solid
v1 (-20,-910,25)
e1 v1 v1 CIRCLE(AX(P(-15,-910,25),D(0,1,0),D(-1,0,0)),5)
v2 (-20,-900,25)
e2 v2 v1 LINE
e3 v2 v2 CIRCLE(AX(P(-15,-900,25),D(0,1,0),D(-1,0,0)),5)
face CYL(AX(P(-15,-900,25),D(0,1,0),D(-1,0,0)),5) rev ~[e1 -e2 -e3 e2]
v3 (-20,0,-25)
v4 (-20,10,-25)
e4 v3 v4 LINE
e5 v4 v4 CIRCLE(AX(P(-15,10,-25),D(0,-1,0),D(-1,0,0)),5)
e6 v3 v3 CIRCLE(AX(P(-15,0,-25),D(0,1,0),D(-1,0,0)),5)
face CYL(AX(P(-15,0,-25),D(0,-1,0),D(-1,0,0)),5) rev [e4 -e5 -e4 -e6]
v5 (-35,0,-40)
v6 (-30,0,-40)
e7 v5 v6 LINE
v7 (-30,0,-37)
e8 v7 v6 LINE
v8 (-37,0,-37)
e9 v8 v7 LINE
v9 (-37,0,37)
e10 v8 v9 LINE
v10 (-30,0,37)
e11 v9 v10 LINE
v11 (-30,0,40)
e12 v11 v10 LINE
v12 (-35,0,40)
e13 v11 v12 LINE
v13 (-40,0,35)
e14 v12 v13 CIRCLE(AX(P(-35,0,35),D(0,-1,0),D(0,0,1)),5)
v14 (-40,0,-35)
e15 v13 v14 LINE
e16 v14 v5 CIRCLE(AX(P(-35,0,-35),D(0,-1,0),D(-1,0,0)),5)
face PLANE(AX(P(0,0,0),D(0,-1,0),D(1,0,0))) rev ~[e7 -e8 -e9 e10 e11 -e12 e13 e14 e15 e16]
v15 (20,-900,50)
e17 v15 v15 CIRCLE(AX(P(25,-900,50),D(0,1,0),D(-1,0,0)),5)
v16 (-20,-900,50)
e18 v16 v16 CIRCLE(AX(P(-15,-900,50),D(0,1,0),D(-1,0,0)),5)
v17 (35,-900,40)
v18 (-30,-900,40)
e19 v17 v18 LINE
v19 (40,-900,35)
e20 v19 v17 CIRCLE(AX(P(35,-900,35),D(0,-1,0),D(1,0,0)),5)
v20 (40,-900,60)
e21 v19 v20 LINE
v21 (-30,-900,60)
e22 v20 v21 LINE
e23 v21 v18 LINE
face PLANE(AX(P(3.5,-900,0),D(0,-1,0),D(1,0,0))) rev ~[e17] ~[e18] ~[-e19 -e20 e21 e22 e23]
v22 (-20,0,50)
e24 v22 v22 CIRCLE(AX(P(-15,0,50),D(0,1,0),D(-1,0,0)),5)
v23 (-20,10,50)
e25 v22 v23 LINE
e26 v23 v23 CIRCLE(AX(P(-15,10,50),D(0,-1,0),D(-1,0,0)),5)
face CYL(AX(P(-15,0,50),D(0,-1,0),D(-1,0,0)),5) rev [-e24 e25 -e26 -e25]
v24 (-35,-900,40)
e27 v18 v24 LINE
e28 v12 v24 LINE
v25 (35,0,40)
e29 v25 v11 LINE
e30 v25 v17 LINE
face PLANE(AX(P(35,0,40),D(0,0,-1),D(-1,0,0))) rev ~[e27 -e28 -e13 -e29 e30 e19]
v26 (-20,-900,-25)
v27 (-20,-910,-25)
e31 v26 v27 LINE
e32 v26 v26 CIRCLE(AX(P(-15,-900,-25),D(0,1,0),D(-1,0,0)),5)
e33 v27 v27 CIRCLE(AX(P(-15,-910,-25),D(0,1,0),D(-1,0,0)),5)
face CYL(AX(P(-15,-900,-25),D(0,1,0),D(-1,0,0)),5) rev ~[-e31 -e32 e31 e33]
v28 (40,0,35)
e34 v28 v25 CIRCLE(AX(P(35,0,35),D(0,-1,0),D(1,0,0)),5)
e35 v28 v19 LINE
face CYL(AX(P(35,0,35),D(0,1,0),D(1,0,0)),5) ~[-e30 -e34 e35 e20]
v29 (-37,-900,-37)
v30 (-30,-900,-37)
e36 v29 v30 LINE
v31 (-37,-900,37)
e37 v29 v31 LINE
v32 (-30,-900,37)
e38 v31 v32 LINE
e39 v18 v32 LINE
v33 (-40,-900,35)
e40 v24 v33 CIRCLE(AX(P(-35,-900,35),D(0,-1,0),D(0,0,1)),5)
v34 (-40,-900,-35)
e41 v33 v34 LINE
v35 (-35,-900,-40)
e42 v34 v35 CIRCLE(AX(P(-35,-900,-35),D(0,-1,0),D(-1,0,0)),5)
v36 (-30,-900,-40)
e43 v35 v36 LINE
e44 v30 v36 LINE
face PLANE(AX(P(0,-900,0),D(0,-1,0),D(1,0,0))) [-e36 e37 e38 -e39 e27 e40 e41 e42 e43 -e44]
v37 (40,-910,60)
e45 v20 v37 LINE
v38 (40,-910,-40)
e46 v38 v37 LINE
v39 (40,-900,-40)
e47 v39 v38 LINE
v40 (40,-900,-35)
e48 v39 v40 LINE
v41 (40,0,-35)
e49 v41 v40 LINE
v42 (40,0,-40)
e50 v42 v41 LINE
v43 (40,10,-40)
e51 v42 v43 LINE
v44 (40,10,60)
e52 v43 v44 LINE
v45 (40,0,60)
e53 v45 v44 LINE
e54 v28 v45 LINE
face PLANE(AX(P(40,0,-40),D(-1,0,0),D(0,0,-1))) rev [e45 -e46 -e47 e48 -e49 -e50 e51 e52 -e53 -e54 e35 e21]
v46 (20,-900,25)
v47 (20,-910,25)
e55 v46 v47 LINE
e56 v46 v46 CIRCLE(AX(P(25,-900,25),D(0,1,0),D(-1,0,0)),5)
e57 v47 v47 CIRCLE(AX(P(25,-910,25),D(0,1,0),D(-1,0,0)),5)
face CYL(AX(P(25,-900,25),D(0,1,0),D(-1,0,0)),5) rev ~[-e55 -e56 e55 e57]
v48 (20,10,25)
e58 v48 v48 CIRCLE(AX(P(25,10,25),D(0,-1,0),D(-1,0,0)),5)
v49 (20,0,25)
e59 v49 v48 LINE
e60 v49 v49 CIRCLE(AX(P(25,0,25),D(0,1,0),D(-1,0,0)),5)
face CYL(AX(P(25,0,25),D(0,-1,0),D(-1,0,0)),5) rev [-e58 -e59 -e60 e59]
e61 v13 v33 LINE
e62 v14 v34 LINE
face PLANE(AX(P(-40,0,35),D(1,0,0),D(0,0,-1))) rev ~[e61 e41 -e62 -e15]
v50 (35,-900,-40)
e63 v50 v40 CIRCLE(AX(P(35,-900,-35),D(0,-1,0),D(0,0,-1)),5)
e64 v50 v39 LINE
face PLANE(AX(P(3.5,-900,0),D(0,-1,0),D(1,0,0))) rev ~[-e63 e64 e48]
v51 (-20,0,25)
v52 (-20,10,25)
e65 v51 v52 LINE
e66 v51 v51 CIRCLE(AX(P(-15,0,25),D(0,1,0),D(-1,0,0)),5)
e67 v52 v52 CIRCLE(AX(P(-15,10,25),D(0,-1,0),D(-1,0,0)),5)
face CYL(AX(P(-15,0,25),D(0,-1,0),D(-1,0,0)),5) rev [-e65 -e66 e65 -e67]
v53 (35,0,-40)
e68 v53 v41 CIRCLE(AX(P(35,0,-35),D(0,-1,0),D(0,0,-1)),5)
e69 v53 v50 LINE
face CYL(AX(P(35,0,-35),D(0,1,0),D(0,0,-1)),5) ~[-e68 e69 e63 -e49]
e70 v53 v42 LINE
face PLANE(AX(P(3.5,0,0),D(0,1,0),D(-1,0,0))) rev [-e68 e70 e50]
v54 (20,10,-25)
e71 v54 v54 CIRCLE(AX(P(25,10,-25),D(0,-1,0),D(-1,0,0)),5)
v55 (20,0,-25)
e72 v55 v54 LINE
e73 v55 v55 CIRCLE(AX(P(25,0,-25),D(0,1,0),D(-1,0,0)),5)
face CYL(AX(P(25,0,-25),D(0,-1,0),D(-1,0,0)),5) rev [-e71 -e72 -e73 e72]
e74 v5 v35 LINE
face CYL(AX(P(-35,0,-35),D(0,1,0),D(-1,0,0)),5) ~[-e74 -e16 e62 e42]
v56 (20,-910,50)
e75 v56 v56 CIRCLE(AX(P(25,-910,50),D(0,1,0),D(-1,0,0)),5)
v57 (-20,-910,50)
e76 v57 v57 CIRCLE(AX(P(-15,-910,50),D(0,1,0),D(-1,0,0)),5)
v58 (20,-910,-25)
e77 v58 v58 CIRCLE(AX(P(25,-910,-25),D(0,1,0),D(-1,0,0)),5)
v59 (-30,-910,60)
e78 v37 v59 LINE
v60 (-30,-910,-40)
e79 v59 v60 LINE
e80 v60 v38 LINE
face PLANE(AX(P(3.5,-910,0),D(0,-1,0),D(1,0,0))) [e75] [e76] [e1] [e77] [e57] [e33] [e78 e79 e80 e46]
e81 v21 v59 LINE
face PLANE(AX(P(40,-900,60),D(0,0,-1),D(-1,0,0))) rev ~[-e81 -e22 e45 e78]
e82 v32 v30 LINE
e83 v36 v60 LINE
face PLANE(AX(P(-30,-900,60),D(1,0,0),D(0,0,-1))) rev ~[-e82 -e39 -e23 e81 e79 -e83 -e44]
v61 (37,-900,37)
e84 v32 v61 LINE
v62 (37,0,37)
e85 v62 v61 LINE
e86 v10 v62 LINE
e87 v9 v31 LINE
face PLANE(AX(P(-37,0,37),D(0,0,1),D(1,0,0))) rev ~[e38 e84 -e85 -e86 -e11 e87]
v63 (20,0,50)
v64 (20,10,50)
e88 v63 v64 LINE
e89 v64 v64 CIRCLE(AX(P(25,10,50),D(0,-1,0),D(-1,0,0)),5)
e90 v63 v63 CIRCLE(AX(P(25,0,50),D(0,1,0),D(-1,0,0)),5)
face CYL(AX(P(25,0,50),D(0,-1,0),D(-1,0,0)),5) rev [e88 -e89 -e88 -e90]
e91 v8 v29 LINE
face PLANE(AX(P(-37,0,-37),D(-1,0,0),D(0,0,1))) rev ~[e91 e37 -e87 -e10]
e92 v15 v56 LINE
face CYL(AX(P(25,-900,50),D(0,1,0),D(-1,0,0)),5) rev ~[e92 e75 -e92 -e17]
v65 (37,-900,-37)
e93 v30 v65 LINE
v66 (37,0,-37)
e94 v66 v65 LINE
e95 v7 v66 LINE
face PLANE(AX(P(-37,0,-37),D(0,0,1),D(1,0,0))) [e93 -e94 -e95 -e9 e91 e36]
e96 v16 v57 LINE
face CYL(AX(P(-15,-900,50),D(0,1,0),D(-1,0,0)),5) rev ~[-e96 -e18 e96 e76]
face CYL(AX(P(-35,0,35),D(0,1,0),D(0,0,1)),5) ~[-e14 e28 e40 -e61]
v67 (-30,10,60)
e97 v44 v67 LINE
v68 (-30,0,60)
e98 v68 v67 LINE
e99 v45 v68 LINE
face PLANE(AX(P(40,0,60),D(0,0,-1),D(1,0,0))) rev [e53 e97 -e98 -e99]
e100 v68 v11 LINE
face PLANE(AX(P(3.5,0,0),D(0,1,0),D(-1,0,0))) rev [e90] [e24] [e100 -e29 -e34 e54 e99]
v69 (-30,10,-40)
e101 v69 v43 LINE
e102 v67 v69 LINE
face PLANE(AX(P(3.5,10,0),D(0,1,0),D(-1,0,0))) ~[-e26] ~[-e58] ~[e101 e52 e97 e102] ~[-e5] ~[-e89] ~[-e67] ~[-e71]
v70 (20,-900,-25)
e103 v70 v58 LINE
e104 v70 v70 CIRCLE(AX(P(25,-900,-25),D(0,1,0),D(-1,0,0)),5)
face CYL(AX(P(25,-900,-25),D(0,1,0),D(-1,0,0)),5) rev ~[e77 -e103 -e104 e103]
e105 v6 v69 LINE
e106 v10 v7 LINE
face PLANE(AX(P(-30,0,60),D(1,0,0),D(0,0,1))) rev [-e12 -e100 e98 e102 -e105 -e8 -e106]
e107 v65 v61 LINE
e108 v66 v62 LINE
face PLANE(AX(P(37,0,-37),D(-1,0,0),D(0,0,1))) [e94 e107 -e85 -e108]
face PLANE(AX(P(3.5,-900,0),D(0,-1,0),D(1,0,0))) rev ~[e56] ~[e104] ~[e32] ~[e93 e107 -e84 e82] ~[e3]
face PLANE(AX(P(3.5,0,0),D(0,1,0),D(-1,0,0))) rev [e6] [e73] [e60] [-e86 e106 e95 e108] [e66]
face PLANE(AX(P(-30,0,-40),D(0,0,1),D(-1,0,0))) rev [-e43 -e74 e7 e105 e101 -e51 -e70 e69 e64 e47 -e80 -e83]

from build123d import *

# Parameters (mm, degrees)
F0_W     = 74
F0_H     = 74
F1_DEPTH = 900
F2_W     = 67
F2_H     = 74
F3_DEPTH = 10
F4_R     = 5
F5_DEPTH = 25


# Not quite as in the source:
# - a pattern or mirror of a feature is missing from the dataset's text; its kind, count and spacing are read off the source's solid


with BuildPart() as f1:
    # F0 (on Front) → F1 (new body)
    with BuildSketch(Plane.XZ):
        with BuildLine():
            ThreePointArc((40, 35), (38.5355339059, 38.5355339059), (35, 40))
            Line((35, 40), (-35, 40))
            ThreePointArc((-35, 40), (-38.5355339059, 38.5355339059), (-40, 35))
            Line((-40, 35), (-40, -35))
            ThreePointArc((-40, -35), (-38.5355339059, -38.5355339059), (-35, -40))
            Line((-35, -40), (35, -40))
            ThreePointArc((35, -40), (38.5355339059, -38.5355339059), (40, -35))
            Line((40, -35), (40, 35))
        make_face()
        Rectangle(F0_W, F0_H, mode=Mode.SUBTRACT)
    extrude(amount=F1_DEPTH)

    # F2 (on face) → F3 (join)
    with BuildSketch(Plane.XZ.offset(900)):
        with Locations((3.5, 0)):
            Rectangle(F2_W, F2_H)
        with BuildLine():
            Line((-30, -37), (-30, -40))
            Line((-30, -40), (35, -40))
            ThreePointArc((35, -40), (38.5355339059, -38.5355339059), (40, -35))
            Line((40, -35), (40, 35))
            ThreePointArc((40, 35), (38.5355339059, 38.5355339059), (35, 40))
            Line((35, 40), (-30, 40))
            Line((-30, 40), (-30, 37))
            Line((-30, 37), (37, 37))
            Line((37, 37), (37, -37))
            Line((37, -37), (-30, -37))
        make_face()
        with BuildLine():
            ThreePointArc((40, -35), (38.5355339059, -38.5355339059), (35, -40))
            Line((35, -40), (40, -40))
            Line((40, -40), (40, -35))
        make_face()
        with BuildLine():
            ThreePointArc((35, 40), (38.5355339059, 38.5355339059), (40, 35))
            Line((40, 35), (40, 60))
            Line((40, 60), (-30, 60))
            Line((-30, 60), (-30, 40))
            Line((-30, 40), (35, 40))
        make_face()
    f3 = extrude(amount=F3_DEPTH)

    # F3_copies: F3 across plane
    add(f3.mirror(Plane.ZX.offset(-450)))

    # F4 (on face) → F5 (cut)
    with BuildSketch(Plane(origin=(0, -900, 0), x_dir=(-1, 0, 0), z_dir=(0, 1, 0))):
        with Locations((-25, 50)):
            Circle(F4_R)
        with Locations((15, 50)):
            Circle(F4_R)
        with Locations((15, 25)):
            Circle(F4_R)
        with Locations((-25, 25)):
            Circle(F4_R)
        with Locations((-25, -25)):
            Circle(F4_R)
        with Locations((15, -25)):
            Circle(F4_R)
    f5 = extrude(amount=-F5_DEPTH, mode=Mode.SUBTRACT)

    # F5_copies: F5 across plane
    add(f5.mirror(Plane.ZX.offset(-450)), mode=Mode.SUBTRACT)


solid = f1.part
